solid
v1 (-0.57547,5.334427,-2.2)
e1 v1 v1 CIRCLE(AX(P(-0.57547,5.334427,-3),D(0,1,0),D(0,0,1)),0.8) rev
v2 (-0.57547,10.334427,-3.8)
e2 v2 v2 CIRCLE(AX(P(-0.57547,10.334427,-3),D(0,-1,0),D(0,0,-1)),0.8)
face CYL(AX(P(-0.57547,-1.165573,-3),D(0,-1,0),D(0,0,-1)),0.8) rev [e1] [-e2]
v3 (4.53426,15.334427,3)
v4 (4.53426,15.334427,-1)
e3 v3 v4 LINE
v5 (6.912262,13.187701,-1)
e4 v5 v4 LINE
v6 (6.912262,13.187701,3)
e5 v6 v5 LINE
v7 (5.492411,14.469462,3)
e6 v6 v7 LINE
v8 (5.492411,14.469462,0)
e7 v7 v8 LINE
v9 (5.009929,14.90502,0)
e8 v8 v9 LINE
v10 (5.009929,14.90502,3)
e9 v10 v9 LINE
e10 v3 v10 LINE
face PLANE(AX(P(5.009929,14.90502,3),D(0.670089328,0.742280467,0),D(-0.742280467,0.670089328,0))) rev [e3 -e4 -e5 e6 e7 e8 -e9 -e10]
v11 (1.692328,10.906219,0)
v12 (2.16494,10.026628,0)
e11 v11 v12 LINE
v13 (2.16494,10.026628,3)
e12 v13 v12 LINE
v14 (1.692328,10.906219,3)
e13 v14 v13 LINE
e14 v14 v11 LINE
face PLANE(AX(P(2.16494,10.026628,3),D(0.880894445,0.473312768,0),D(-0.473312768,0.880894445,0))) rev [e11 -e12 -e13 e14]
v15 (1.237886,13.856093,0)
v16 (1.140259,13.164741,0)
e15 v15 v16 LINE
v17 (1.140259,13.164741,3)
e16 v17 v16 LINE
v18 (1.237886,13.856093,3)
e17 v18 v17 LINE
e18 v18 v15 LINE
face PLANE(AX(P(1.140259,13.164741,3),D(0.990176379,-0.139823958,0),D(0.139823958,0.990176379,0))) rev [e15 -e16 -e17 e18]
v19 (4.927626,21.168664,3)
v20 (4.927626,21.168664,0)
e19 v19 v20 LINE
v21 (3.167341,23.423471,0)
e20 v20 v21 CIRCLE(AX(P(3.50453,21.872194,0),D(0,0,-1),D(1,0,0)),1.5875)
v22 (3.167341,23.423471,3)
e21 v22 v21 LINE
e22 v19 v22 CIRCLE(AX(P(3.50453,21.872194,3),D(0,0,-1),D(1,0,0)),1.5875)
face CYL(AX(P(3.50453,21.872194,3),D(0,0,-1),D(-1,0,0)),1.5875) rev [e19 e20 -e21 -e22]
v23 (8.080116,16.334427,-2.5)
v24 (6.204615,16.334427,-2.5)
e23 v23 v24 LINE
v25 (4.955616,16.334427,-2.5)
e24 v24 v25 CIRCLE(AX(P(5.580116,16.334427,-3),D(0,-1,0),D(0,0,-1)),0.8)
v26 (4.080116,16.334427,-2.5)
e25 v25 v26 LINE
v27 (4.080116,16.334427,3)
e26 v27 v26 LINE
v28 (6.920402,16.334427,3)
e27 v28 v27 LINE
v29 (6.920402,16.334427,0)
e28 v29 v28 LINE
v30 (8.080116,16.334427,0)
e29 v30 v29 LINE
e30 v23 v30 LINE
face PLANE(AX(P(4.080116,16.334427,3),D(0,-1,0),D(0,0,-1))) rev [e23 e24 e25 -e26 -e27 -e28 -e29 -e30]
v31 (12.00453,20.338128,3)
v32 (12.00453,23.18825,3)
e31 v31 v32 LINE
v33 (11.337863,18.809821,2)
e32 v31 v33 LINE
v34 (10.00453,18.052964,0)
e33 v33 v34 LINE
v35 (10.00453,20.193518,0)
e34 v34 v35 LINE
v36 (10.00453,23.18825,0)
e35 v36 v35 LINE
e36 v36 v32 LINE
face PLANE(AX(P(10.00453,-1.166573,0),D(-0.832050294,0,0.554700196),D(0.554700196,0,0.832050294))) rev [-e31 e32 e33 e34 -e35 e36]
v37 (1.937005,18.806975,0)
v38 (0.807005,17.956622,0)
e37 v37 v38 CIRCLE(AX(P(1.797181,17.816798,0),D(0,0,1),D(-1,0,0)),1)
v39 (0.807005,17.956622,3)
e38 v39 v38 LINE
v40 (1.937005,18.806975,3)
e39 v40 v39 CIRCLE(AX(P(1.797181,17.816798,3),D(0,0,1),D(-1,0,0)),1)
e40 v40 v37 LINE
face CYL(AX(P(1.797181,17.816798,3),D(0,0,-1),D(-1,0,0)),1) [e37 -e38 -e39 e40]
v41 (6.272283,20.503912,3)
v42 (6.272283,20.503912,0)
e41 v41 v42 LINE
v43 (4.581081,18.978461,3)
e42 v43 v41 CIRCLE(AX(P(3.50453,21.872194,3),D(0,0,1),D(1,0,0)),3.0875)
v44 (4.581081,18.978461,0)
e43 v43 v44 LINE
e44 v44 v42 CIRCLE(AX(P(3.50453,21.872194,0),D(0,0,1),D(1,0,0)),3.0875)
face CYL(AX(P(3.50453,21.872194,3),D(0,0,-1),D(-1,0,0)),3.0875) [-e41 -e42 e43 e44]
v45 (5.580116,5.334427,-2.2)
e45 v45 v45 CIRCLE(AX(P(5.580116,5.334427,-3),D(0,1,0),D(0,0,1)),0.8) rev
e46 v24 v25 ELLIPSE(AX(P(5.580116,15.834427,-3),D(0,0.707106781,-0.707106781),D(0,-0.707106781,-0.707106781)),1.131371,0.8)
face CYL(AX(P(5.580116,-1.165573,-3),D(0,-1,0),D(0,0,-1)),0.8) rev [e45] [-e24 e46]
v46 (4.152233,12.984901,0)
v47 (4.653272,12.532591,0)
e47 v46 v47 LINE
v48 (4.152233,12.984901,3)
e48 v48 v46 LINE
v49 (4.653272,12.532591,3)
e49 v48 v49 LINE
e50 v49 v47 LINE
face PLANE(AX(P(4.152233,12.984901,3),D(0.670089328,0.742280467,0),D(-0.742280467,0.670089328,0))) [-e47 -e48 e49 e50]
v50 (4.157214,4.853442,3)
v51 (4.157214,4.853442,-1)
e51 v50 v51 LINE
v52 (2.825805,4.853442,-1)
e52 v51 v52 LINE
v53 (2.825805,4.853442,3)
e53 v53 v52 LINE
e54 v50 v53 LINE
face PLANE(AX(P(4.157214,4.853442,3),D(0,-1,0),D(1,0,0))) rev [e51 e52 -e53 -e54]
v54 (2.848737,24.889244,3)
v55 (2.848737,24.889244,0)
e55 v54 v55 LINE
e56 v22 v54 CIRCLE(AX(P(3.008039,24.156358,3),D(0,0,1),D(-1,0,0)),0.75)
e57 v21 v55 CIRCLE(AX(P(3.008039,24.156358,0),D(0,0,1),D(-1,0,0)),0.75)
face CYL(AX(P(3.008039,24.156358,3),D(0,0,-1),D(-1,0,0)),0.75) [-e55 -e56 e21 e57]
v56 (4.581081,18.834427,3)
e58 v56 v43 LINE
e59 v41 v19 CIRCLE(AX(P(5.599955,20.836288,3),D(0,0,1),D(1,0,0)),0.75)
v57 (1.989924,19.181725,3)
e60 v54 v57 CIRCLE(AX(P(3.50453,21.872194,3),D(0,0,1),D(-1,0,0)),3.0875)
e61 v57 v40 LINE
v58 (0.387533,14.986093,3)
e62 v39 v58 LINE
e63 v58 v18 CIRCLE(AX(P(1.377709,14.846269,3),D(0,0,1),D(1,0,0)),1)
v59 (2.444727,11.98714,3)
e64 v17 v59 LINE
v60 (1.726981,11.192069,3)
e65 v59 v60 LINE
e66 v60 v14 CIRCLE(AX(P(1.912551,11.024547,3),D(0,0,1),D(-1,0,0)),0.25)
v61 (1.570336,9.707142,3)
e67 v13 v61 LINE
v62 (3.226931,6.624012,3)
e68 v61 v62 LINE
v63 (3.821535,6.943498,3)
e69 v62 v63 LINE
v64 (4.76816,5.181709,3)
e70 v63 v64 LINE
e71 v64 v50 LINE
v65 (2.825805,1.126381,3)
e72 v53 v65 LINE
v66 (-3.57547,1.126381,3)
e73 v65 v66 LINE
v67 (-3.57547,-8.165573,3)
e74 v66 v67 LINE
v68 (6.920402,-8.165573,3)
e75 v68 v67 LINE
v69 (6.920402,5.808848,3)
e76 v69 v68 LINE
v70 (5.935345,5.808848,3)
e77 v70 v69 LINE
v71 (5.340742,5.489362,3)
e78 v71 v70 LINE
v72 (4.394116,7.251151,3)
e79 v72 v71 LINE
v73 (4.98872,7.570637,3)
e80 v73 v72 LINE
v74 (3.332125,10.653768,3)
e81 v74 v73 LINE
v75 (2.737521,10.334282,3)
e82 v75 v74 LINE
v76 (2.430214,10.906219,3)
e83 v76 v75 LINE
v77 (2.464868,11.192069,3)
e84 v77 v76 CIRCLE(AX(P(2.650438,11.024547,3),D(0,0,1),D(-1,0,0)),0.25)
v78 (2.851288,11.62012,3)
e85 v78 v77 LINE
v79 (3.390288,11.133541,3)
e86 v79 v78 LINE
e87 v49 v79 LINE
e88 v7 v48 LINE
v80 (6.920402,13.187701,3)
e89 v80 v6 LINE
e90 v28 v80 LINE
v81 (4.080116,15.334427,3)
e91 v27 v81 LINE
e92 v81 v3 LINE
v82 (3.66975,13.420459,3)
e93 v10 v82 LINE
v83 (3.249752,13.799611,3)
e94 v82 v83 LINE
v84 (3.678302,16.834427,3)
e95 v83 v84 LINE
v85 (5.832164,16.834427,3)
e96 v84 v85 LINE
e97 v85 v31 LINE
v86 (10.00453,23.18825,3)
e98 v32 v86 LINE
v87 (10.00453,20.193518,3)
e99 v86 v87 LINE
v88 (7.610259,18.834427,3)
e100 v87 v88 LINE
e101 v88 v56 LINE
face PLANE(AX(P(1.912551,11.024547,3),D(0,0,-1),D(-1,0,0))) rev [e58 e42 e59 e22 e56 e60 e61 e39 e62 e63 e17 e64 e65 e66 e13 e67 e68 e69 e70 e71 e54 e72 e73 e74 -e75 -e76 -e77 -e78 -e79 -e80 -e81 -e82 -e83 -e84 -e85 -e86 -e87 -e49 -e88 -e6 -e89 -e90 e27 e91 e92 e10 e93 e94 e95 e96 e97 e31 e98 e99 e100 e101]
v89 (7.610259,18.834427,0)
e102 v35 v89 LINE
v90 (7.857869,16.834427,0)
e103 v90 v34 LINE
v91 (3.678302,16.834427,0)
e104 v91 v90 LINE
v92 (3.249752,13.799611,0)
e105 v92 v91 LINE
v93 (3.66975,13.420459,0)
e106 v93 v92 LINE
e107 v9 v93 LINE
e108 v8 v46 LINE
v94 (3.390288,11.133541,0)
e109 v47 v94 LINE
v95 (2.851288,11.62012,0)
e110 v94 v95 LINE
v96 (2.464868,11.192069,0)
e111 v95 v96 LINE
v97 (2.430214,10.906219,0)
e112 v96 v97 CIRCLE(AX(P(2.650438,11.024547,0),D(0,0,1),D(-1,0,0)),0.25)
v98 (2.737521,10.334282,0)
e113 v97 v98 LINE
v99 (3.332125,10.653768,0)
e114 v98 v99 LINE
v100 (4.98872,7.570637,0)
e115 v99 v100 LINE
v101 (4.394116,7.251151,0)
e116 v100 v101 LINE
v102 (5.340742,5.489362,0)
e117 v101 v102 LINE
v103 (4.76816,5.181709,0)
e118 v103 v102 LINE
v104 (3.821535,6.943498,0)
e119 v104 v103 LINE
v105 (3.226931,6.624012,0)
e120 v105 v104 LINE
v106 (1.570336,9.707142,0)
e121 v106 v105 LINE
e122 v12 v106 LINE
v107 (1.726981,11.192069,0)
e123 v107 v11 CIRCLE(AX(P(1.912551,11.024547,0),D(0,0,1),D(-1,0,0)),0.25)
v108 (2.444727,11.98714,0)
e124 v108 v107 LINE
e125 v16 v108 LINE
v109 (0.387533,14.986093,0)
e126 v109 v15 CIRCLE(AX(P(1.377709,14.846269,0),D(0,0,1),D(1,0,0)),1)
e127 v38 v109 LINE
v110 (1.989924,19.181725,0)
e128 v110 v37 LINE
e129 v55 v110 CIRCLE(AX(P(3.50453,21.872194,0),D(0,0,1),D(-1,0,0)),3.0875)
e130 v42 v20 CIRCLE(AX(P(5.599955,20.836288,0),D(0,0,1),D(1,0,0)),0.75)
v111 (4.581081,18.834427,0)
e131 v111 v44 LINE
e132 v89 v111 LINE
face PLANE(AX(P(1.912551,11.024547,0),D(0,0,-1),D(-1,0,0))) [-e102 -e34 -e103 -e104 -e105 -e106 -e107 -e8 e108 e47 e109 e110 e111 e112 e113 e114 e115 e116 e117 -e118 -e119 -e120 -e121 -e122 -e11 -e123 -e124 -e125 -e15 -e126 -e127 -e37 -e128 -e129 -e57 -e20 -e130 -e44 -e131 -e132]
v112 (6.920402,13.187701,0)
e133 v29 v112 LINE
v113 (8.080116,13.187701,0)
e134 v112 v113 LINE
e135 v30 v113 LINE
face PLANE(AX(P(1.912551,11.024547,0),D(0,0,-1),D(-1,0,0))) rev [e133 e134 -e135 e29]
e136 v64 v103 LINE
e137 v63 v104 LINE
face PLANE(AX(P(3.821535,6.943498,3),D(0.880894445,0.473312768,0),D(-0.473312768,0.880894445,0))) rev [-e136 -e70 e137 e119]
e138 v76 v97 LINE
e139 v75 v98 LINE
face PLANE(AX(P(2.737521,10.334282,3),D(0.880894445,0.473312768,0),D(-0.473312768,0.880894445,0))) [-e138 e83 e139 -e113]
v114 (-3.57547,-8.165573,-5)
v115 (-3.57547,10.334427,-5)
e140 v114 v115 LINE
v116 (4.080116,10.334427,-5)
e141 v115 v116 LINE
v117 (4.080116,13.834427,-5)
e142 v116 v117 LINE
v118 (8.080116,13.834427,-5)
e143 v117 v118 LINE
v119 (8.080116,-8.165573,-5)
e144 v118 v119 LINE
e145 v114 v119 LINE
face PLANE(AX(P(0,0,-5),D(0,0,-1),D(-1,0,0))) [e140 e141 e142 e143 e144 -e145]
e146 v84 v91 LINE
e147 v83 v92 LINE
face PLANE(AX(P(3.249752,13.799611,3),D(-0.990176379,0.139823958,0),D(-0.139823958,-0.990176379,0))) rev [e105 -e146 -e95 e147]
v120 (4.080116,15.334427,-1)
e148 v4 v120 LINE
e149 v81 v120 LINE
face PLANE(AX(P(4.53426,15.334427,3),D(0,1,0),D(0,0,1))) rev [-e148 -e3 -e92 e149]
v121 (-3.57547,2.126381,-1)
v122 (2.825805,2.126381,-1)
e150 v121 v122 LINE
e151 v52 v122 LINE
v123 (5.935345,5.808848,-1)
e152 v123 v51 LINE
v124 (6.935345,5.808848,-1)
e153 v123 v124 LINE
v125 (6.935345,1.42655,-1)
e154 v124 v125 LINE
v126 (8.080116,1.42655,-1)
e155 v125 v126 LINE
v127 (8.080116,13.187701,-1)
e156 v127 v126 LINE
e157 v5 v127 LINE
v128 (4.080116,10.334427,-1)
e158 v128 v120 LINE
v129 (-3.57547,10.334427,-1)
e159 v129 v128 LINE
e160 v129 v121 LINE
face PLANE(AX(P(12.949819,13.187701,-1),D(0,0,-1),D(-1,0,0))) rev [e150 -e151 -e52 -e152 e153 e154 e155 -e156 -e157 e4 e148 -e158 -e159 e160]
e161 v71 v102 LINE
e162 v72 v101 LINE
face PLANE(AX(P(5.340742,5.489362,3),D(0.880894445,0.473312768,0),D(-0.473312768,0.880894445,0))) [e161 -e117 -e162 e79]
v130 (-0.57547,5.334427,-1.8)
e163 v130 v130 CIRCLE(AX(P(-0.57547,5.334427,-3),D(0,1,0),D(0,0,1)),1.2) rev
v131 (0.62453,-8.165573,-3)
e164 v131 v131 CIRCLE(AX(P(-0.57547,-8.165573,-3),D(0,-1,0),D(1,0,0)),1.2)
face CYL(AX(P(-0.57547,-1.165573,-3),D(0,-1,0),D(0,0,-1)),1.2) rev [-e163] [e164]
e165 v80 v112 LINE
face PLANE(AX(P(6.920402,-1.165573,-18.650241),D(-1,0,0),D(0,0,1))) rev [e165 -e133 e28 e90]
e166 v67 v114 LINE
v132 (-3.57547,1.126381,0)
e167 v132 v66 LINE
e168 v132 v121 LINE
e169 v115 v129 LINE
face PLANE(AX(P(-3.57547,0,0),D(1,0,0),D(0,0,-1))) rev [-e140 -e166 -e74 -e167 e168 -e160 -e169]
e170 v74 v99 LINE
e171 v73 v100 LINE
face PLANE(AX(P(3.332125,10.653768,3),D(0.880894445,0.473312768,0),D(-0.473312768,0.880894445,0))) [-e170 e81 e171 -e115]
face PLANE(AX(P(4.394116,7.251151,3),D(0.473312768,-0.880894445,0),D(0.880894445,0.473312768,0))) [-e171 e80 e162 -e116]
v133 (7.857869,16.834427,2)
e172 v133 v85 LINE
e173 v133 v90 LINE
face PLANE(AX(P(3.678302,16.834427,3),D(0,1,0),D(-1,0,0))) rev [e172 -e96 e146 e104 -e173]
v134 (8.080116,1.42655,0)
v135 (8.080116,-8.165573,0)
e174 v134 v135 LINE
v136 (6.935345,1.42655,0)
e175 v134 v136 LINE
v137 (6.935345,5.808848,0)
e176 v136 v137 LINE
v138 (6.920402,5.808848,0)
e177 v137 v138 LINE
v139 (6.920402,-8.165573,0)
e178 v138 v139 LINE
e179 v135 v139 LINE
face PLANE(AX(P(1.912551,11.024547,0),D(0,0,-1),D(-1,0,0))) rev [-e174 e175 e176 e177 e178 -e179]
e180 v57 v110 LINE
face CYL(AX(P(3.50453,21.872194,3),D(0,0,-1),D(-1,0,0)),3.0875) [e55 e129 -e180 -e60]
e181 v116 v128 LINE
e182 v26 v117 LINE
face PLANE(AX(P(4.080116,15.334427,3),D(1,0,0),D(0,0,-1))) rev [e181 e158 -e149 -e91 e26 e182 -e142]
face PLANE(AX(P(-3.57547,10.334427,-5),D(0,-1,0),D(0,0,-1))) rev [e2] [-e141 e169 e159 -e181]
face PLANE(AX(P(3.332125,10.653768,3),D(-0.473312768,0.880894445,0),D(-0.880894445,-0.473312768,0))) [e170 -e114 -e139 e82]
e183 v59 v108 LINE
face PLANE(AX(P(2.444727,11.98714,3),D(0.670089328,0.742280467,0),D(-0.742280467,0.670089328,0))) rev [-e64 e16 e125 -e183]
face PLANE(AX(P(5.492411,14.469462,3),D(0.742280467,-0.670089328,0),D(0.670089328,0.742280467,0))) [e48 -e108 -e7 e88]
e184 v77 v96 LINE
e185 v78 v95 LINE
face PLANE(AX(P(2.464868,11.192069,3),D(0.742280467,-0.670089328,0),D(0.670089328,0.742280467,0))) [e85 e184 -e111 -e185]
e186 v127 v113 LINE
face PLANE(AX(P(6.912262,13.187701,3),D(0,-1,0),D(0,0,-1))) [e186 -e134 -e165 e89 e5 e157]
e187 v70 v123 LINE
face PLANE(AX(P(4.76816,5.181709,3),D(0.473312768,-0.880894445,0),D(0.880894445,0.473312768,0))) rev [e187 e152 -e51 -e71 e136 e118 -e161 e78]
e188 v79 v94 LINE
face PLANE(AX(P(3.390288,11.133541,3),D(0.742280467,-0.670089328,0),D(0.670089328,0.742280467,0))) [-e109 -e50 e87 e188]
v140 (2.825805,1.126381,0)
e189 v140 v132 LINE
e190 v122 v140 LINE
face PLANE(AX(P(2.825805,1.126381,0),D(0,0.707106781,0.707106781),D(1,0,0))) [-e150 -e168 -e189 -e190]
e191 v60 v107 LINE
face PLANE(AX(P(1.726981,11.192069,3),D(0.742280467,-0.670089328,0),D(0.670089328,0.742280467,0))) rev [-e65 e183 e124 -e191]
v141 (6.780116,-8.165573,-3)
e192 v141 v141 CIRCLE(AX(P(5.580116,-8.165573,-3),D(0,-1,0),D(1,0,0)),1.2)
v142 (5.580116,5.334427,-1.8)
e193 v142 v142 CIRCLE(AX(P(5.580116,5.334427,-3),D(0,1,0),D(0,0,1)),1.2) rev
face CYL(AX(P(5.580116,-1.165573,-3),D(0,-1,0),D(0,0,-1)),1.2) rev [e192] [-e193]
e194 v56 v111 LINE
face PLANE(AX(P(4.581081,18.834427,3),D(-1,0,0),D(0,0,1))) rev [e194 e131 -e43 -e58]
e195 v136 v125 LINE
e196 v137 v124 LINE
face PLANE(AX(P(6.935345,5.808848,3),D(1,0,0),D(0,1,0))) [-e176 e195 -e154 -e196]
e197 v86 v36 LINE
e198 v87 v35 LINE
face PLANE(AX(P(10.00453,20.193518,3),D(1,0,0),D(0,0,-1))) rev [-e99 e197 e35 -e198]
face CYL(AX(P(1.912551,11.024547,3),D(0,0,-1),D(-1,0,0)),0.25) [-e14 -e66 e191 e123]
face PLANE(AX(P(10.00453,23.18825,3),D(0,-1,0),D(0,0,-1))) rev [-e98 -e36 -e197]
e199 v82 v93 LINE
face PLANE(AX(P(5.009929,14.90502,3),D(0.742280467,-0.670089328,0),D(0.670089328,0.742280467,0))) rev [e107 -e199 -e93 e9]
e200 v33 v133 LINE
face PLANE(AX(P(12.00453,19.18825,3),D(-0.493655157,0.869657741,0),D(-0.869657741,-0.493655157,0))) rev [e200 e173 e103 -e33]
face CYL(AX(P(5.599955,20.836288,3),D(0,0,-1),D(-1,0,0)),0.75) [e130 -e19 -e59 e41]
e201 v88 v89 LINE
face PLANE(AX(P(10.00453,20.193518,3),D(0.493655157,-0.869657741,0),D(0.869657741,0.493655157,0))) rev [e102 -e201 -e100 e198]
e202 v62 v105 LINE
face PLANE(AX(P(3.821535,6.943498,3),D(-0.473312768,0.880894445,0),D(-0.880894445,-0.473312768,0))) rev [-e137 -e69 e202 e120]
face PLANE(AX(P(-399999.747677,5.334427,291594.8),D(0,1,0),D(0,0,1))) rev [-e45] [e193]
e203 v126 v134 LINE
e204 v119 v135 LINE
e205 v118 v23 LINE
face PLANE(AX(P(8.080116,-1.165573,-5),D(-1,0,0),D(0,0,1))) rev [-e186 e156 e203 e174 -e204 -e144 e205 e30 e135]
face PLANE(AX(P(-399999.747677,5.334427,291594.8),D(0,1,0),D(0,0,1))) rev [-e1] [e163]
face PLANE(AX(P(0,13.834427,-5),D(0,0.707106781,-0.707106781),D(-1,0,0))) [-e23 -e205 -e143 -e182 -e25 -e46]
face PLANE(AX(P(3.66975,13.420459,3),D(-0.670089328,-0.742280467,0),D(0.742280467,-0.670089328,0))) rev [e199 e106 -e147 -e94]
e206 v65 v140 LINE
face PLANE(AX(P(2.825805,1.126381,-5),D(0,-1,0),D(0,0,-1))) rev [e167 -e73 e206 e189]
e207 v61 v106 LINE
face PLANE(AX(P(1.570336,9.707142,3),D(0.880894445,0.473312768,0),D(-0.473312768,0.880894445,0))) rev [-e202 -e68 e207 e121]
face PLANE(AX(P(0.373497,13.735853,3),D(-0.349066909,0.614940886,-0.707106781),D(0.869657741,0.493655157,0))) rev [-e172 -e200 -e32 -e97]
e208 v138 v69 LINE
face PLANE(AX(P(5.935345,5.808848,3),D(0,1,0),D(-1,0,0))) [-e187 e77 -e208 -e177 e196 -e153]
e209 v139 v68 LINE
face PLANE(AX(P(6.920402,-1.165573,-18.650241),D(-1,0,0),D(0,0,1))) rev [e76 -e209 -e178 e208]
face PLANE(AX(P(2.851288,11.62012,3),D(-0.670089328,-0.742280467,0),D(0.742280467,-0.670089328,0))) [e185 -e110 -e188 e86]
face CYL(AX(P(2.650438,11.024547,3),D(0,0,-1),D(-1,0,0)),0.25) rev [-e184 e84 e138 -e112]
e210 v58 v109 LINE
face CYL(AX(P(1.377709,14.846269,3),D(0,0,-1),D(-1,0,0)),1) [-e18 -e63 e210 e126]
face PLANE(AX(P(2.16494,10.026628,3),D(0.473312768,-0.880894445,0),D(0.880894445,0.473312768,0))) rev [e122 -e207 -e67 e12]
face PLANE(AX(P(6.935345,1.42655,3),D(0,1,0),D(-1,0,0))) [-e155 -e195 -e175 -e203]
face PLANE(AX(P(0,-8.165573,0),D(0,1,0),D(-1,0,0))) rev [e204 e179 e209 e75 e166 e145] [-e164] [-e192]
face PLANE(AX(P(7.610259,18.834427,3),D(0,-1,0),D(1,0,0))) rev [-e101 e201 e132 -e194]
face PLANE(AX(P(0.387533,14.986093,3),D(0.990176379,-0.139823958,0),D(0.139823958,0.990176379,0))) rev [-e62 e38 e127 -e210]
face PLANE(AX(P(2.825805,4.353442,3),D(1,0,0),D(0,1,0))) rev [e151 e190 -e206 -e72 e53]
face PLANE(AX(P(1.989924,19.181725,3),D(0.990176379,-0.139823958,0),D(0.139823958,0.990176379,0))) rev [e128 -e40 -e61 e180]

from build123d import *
from build123d.topology import SkipClean

# Parameters (mm, degrees)
BOSS_SWITCH_BODY_DEPTH                = 3
SKETCH1_W                             = 4
SKETCH1_H                             = 3.146726578
BOSS_FLANGE_WIDTH_DEPTH               = 5
BOSS_FLANGE_HEIGHT_REACH              = 32.536
SKETCH2_W                             = 4
SKETCH2_H                             = 3.146726578
SKETCH2_W_2                           = 8
SKETCH2_H_2                           = 2.29195361
SKETCH17_W                            = 11.655585698
SKETCH17_H                            = 4
BOSS_FLANGE_SUPPORT_DEPTH             = 12.061319812
CUT_WALL_GAP_DEPTH                    = 1
SKETCH26_W                            = 7.655585698
SKETCH26_H                            = 6
CUT_CAM_SLOPE_CLEARANCE_DEPTH         = 29.549094119
TAP_DRILL_FOR_M2X0_4_TAP1_D           = 1.6
M2_CLEARANCE_HOLE2_D                  = 2.4
M2_CLEARANCE_HOLE2_DEPTH              = 6.5
CUT_UP_TO_DOWN_CANTILEVER_SLOPE_REACH = 30.228
CHAMFER_FLANGE_SUPPORT_3_SIZE         = 1
CHAMFER7_SIZE                         = 1
SKETCH25_W                            = 6.448372016
SKETCH25_H                            = 17.5
CUT_BASE_REMOVAL_DEPTH                = 3
CHAMFER8_SIZE                         = 2.5
SKETCH28_R                            = 1.2
BOSS_REAR_FILL_DEPTH                  = 7


with BuildPart() as part:
    # Sketch-SwitchBossUp → Boss-Switch Body (new body)
    with BuildSketch(Plane.XY):
        with BuildLine():
            Line((10.004529844, 20.193518123), (10.004529844, 23.188250119))
            Line((10.004529844, 23.188250119), (12.004529844, 23.188250119))
            Line((12.004529844, 23.188250119), (12.004529844, 19.188250119))
            Line((12.004529844, 19.188250119), (7.857869287, 16.834427149))
            Line((7.857869287, 16.834427149), (3.678301726, 16.834427149))
            Line((3.678301726, 16.834427149), (3.249751742, 13.799610523))
            Line((3.249751742, 13.799610523), (3.669750435, 13.420459172))
            Line((3.669750435, 13.420459172), (5.009929091, 14.905020107))
            Line((5.009929091, 14.905020107), (4.534260481, 15.334427149))
            Line((4.534260481, 15.334427149), (4.080115542, 15.334427149))
            Line((4.080115542, 15.334427149), (4.080115542, 16.334427149))
            Line((4.080115542, 16.334427149), (7.056733116, 16.334427149))
            Line((7.056733116, 16.334427149), (13.368774055, 16.334427149))
            Line((13.368774055, 16.334427149), (13.368774055, -1.165572851))
            Line((13.368774055, -1.165572851), (5.219466869, -1.165572851))
            Line((5.219466869, -1.165572851), (3.260297574, -1.165572851))
            Line((3.260297574, -1.165572851), (3.260297574, 1.126380759))
            Line((3.260297574, 1.126380759), (2.82580452, 1.126380759))
            Line((2.82580452, 1.126380759), (2.82580452, 4.353442062))
            Line((2.82580452, 4.353442062), (2.82580452, 4.853442062))
            Line((2.82580452, 4.853442062), (4.157214411, 4.853442062))
            Line((4.157214411, 4.853442062), (4.768160192, 5.181708905))
            Line((4.768160192, 5.181708905), (3.821534656, 6.943497796))
            Line((3.821534656, 6.943497796), (3.226930905, 6.624011677))
            Line((3.226930905, 6.624011677), (1.570336216, 9.707142235))
            Line((1.570336216, 9.707142235), (2.164939967, 10.026628353))
            Line((2.164939967, 10.026628353), (1.692327837, 10.906218823))
            ThreePointArc((1.692327837, 10.906218823), (1.664368515, 11.054634089), (1.726981331, 11.192069347))
            Line((1.726981331, 11.192069347), (2.444726799, 11.987140122))
            Line((2.444726799, 11.987140122), (1.905726754, 12.473719244))
            Line((1.905726754, 12.473719244), (1.140258894, 13.164740854))
            Line((1.140258894, 13.164740854), (1.237885501, 13.856092765))
            ThreePointArc((1.237885501, 13.856092765), (0.578678558, 14.244979181), (0.38753308, 14.986093101))
            Line((0.38753308, 14.986093101), (0.807004952, 17.956622238))
            ThreePointArc((0.807004952, 17.956622238), (1.195891368, 18.61582918), (1.937005288, 18.806974659))
            Line((1.937005288, 18.806974659), (1.989924178, 19.181724706))
            ThreePointArc((1.989924178, 19.181724706), (0.451399887, 22.331599998), (2.848737223, 24.889244431))
            ThreePointArc((2.848737223, 24.889244431), (3.740925778, 24.315659579), (3.167340926, 23.423471024))
            ThreePointArc((3.167340926, 23.423471024), (2.253195858, 20.895301387), (4.927625811, 21.168664412))
            ThreePointArc((4.927625811, 21.168664412), (5.932330877, 21.508616953), (6.272283418, 20.503911887))
            ThreePointArc((6.272283418, 20.503911887), (5.572480513, 19.579545857), (4.581080915, 18.978460587))
            Line((4.581080915, 18.978460587), (4.581080915, 18.834427149))
            Line((4.581080915, 18.834427149), (7.610259328, 18.834427149))
            Line((7.610259328, 18.834427149), (10.004529844, 20.193518123))
        make_face()
        with BuildLine():
            Line((3.332125106, 10.653767771), (2.737521356, 10.334281653))
            Line((2.737521356, 10.334281653), (2.430214202, 10.906218823))
            ThreePointArc((2.430214202, 10.906218823), (2.40225488, 11.054634089), (2.464867696, 11.192069347))
            Line((2.464867696, 11.192069347), (2.851287644, 11.620119709))
            Line((2.851287644, 11.620119709), (3.390287689, 11.133540588))
            Line((3.390287689, 11.133540588), (4.653272054, 12.532590813))
            Line((4.653272054, 12.532590813), (4.152232739, 12.984901109))
            Line((4.152232739, 12.984901109), (5.492411395, 14.469462044))
            Line((5.492411395, 14.469462044), (6.912261653, 13.187700571))
            Line((6.912261653, 13.187700571), (10.437466736, 13.187700571))
            Line((10.437466736, 13.187700571), (10.437466736, 2.560049805))
            Line((10.437466736, 2.560049805), (9.303967163, 1.426550232))
            Line((9.303967163, 1.426550232), (6.935345332, 1.426550232))
            Line((6.935345332, 1.426550232), (6.935345332, 5.808848323))
            Line((6.935345332, 5.808848323), (5.935345332, 5.808848323))
            Line((5.935345332, 5.808848323), (5.340741582, 5.489362205))
            Line((5.340741582, 5.489362205), (4.394116045, 7.251151095))
            Line((4.394116045, 7.251151095), (4.988719795, 7.570637214))
            Line((4.988719795, 7.570637214), (3.332125106, 10.653767771))
        make_face(mode=Mode.SUBTRACT)
    extrude(amount=BOSS_SWITCH_BODY_DEPTH)

    # Sketch1 → Boss-Flange Width (add)
    with BuildSketch(Plane(origin=(0, 0, 0), x_dir=(-1, 0, 0), z_dir=(0, 0, -1))):
        Polygon((-6.935345332, 5.808848323), (-5.935345332, 5.808848323), (-4.157214411, 4.853442062), (-2.82580452, 4.853442062), (-2.82580452, 1.126380759), (0.412170615, 1.126380759), (0.412170615, -1.165572851), (-8.080115542, -1.165572851), (-8.080115542, 1.426550232), (-6.935345332, 1.426550232), align=None)
        with Locations((-6.080115542, 14.76106386)):
            Rectangle(SKETCH1_W, SKETCH1_H)
    extrude(amount=BOSS_FLANGE_WIDTH_DEPTH)

    # Sketch2 → Boss-Flange Height (add, up to next)
    with BuildSketch(Plane(origin=(-3.575470156, 0, 0), x_dir=(0, 0, -1), z_dir=(1, 0, 0)), mode=Mode.PRIVATE) as boss_flange_height_sk1:
        with Locations((3, 14.76106386)):
            Rectangle(SKETCH2_W, SKETCH2_H)
    boss_flange_height_tool1 = extrude(boss_flange_height_sk1.sketch, amount=BOSS_FLANGE_HEIGHT_REACH, mode=Mode.PRIVATE) - part.part
    # Sketch2 → Boss-Flange Height (add, up to next)
    with BuildSketch(Plane(origin=(-3.575470156, 0, 0), x_dir=(0, 0, -1), z_dir=(1, 0, 0)), mode=Mode.PRIVATE) as boss_flange_height_sk2:
        with Locations((1, -0.019596046)):
            Rectangle(SKETCH2_W_2, SKETCH2_H_2)
    boss_flange_height_tool2 = extrude(boss_flange_height_sk2.sketch, amount=BOSS_FLANGE_HEIGHT_REACH, mode=Mode.PRIVATE) - part.part
    add(boss_flange_height_tool1.solids().sort_by_distance((-3.57547, 14.761064, -3))[0])
    add(boss_flange_height_tool2.solids().sort_by_distance((-3.57547, -0.019596, -1))[0])

    # Sketch17 → Boss-Flange Support (add)
    with BuildSketch(Plane.XZ.offset(-1.126380759)):
        with Locations((2.252322693, -3)):
            Rectangle(SKETCH17_W, SKETCH17_H)
    extrude(amount=-BOSS_FLANGE_SUPPORT_DEPTH)

    # Sketch27 → Cut-Wall Gap (cut)
    with BuildSketch(Plane.XY):
        Polygon((4.080115542, 15.334427149), (4.534260481, 15.334427149), (6.912261653, 13.187700571), (4.080115542, 13.187700571), align=None)
    extrude(amount=-CUT_WALL_GAP_DEPTH, mode=Mode.SUBTRACT)

    # Sketch26 → Cut-Cam Slope Clearance (cut, through all)
    with BuildSketch(Plane.XY.offset(-1)):
        with Locations((0.252322693, 13.334427149)):
            Rectangle(SKETCH26_W, SKETCH26_H)
    extrude(amount=-CUT_CAM_SLOPE_CLEARANCE_DEPTH, mode=Mode.SUBTRACT)

    # Tap Drill for M2x0.4 Tap1 (through all)
    with Locations(Plane(origin=(0, -1.165572851, 0), x_dir=(-1, 0, 0), z_dir=(0, -1, 0))):
        with Locations((0.575470156, 3), (-5.580115542, 3)):
            Hole(TAP_DRILL_FOR_M2X0_4_TAP1_D / 2)

    # M2 Clearance Hole2
    with Locations(Plane.XZ.offset(1.165572851)):
        with Locations((-0.575470156, -3), (5.580115542, -3)):
            Hole(M2_CLEARANCE_HOLE2_D / 2, depth=M2_CLEARANCE_HOLE2_DEPTH)

    # Sketch12 → Cut-Up-to-Down Cantilever Slope (cut, up to next)
    with BuildSketch(Plane(origin=(0, 23.188250119, 0), x_dir=(1, 0, 0), z_dir=(0, 1, 0)), mode=Mode.PRIVATE) as cut_up_to_down_cantilever_slope_sk1:
        Polygon((10.004529844, 0), (12.004529844, -3), (12.004529844, 0), align=None)
    cut_up_to_down_cantilever_slope_tool1 = extrude(cut_up_to_down_cantilever_slope_sk1.sketch, amount=-CUT_UP_TO_DOWN_CANTILEVER_SLOPE_REACH, mode=Mode.PRIVATE) & part.part
    add(cut_up_to_down_cantilever_slope_tool1.solids().sort_by_distance((11.337863, 23.18825, 1))[0], mode=Mode.SUBTRACT)

    # Chamfer-Flange Support 3
    chamfer_flange_support_3_edges = [part.edges().sort_by_distance(p)[0] for p in [
        (-0.374832818, 1.126380759, -1),
    ]]
    chamfer(chamfer_flange_support_3_edges, length=CHAMFER_FLANGE_SUPPORT_3_SIZE)

    # Chamfer7
    chamfer7_edges = [part.edges().sort_by_distance(p)[0] for p in [
        (9.931199565, 18.011338634, 3),
    ]]
    chamfer(chamfer7_edges, length=CHAMFER7_SIZE)

    # Sketch25 → Cut-Base Removal (cut)
    with BuildSketch(Plane.XY.offset(3)):
        with Locations((10.144588047, 7.584427149)):
            Rectangle(SKETCH25_W, SKETCH25_H)
    extrude(amount=-CUT_BASE_REMOVAL_DEPTH, mode=Mode.SUBTRACT)

    # Chamfer8
    # the kernel refuses this chamfer: 2.5 mm, written as the material it takes off along each edge
    with BuildSketch(Plane(origin=(14.509323012, 16.334427149, -5), x_dir=(0, 0.027495876610586317, 0.9996219169112968), z_dir=(-1, 0, 0))) as chamfer8_piece_1:
        Polygon((CHAMFER8_SIZE * 0.999621916911, -CHAMFER8_SIZE * 0.0274958766106), (-CHAMFER8_SIZE * 0.0274958766106, -CHAMFER8_SIZE * 0.999621916911), (0, 0), align=None)
    extrude(amount=16.85841494, mode=Mode.SUBTRACT)

    # Sketch28 → Boss-Rear Fill (add)
    with SkipClean():  # the faces are left unmerged after this step: merging them gives an invalid solid
        with BuildSketch(Plane.XZ.offset(1.165572851)):
            Polygon((-3.575470156, 3), (6.920402039, 3), (6.920402039, 0), (8.080115542, 0), (8.080115542, -5), (-3.575470156, -5), align=None)
            with Locations((5.580115542, -3)):
                Circle(SKETCH28_R, mode=Mode.SUBTRACT)
            with Locations((-0.575470156, -3)):
                Circle(SKETCH28_R, mode=Mode.SUBTRACT)
        extrude(amount=BOSS_REAR_FILL_DEPTH)


solid = part.part
